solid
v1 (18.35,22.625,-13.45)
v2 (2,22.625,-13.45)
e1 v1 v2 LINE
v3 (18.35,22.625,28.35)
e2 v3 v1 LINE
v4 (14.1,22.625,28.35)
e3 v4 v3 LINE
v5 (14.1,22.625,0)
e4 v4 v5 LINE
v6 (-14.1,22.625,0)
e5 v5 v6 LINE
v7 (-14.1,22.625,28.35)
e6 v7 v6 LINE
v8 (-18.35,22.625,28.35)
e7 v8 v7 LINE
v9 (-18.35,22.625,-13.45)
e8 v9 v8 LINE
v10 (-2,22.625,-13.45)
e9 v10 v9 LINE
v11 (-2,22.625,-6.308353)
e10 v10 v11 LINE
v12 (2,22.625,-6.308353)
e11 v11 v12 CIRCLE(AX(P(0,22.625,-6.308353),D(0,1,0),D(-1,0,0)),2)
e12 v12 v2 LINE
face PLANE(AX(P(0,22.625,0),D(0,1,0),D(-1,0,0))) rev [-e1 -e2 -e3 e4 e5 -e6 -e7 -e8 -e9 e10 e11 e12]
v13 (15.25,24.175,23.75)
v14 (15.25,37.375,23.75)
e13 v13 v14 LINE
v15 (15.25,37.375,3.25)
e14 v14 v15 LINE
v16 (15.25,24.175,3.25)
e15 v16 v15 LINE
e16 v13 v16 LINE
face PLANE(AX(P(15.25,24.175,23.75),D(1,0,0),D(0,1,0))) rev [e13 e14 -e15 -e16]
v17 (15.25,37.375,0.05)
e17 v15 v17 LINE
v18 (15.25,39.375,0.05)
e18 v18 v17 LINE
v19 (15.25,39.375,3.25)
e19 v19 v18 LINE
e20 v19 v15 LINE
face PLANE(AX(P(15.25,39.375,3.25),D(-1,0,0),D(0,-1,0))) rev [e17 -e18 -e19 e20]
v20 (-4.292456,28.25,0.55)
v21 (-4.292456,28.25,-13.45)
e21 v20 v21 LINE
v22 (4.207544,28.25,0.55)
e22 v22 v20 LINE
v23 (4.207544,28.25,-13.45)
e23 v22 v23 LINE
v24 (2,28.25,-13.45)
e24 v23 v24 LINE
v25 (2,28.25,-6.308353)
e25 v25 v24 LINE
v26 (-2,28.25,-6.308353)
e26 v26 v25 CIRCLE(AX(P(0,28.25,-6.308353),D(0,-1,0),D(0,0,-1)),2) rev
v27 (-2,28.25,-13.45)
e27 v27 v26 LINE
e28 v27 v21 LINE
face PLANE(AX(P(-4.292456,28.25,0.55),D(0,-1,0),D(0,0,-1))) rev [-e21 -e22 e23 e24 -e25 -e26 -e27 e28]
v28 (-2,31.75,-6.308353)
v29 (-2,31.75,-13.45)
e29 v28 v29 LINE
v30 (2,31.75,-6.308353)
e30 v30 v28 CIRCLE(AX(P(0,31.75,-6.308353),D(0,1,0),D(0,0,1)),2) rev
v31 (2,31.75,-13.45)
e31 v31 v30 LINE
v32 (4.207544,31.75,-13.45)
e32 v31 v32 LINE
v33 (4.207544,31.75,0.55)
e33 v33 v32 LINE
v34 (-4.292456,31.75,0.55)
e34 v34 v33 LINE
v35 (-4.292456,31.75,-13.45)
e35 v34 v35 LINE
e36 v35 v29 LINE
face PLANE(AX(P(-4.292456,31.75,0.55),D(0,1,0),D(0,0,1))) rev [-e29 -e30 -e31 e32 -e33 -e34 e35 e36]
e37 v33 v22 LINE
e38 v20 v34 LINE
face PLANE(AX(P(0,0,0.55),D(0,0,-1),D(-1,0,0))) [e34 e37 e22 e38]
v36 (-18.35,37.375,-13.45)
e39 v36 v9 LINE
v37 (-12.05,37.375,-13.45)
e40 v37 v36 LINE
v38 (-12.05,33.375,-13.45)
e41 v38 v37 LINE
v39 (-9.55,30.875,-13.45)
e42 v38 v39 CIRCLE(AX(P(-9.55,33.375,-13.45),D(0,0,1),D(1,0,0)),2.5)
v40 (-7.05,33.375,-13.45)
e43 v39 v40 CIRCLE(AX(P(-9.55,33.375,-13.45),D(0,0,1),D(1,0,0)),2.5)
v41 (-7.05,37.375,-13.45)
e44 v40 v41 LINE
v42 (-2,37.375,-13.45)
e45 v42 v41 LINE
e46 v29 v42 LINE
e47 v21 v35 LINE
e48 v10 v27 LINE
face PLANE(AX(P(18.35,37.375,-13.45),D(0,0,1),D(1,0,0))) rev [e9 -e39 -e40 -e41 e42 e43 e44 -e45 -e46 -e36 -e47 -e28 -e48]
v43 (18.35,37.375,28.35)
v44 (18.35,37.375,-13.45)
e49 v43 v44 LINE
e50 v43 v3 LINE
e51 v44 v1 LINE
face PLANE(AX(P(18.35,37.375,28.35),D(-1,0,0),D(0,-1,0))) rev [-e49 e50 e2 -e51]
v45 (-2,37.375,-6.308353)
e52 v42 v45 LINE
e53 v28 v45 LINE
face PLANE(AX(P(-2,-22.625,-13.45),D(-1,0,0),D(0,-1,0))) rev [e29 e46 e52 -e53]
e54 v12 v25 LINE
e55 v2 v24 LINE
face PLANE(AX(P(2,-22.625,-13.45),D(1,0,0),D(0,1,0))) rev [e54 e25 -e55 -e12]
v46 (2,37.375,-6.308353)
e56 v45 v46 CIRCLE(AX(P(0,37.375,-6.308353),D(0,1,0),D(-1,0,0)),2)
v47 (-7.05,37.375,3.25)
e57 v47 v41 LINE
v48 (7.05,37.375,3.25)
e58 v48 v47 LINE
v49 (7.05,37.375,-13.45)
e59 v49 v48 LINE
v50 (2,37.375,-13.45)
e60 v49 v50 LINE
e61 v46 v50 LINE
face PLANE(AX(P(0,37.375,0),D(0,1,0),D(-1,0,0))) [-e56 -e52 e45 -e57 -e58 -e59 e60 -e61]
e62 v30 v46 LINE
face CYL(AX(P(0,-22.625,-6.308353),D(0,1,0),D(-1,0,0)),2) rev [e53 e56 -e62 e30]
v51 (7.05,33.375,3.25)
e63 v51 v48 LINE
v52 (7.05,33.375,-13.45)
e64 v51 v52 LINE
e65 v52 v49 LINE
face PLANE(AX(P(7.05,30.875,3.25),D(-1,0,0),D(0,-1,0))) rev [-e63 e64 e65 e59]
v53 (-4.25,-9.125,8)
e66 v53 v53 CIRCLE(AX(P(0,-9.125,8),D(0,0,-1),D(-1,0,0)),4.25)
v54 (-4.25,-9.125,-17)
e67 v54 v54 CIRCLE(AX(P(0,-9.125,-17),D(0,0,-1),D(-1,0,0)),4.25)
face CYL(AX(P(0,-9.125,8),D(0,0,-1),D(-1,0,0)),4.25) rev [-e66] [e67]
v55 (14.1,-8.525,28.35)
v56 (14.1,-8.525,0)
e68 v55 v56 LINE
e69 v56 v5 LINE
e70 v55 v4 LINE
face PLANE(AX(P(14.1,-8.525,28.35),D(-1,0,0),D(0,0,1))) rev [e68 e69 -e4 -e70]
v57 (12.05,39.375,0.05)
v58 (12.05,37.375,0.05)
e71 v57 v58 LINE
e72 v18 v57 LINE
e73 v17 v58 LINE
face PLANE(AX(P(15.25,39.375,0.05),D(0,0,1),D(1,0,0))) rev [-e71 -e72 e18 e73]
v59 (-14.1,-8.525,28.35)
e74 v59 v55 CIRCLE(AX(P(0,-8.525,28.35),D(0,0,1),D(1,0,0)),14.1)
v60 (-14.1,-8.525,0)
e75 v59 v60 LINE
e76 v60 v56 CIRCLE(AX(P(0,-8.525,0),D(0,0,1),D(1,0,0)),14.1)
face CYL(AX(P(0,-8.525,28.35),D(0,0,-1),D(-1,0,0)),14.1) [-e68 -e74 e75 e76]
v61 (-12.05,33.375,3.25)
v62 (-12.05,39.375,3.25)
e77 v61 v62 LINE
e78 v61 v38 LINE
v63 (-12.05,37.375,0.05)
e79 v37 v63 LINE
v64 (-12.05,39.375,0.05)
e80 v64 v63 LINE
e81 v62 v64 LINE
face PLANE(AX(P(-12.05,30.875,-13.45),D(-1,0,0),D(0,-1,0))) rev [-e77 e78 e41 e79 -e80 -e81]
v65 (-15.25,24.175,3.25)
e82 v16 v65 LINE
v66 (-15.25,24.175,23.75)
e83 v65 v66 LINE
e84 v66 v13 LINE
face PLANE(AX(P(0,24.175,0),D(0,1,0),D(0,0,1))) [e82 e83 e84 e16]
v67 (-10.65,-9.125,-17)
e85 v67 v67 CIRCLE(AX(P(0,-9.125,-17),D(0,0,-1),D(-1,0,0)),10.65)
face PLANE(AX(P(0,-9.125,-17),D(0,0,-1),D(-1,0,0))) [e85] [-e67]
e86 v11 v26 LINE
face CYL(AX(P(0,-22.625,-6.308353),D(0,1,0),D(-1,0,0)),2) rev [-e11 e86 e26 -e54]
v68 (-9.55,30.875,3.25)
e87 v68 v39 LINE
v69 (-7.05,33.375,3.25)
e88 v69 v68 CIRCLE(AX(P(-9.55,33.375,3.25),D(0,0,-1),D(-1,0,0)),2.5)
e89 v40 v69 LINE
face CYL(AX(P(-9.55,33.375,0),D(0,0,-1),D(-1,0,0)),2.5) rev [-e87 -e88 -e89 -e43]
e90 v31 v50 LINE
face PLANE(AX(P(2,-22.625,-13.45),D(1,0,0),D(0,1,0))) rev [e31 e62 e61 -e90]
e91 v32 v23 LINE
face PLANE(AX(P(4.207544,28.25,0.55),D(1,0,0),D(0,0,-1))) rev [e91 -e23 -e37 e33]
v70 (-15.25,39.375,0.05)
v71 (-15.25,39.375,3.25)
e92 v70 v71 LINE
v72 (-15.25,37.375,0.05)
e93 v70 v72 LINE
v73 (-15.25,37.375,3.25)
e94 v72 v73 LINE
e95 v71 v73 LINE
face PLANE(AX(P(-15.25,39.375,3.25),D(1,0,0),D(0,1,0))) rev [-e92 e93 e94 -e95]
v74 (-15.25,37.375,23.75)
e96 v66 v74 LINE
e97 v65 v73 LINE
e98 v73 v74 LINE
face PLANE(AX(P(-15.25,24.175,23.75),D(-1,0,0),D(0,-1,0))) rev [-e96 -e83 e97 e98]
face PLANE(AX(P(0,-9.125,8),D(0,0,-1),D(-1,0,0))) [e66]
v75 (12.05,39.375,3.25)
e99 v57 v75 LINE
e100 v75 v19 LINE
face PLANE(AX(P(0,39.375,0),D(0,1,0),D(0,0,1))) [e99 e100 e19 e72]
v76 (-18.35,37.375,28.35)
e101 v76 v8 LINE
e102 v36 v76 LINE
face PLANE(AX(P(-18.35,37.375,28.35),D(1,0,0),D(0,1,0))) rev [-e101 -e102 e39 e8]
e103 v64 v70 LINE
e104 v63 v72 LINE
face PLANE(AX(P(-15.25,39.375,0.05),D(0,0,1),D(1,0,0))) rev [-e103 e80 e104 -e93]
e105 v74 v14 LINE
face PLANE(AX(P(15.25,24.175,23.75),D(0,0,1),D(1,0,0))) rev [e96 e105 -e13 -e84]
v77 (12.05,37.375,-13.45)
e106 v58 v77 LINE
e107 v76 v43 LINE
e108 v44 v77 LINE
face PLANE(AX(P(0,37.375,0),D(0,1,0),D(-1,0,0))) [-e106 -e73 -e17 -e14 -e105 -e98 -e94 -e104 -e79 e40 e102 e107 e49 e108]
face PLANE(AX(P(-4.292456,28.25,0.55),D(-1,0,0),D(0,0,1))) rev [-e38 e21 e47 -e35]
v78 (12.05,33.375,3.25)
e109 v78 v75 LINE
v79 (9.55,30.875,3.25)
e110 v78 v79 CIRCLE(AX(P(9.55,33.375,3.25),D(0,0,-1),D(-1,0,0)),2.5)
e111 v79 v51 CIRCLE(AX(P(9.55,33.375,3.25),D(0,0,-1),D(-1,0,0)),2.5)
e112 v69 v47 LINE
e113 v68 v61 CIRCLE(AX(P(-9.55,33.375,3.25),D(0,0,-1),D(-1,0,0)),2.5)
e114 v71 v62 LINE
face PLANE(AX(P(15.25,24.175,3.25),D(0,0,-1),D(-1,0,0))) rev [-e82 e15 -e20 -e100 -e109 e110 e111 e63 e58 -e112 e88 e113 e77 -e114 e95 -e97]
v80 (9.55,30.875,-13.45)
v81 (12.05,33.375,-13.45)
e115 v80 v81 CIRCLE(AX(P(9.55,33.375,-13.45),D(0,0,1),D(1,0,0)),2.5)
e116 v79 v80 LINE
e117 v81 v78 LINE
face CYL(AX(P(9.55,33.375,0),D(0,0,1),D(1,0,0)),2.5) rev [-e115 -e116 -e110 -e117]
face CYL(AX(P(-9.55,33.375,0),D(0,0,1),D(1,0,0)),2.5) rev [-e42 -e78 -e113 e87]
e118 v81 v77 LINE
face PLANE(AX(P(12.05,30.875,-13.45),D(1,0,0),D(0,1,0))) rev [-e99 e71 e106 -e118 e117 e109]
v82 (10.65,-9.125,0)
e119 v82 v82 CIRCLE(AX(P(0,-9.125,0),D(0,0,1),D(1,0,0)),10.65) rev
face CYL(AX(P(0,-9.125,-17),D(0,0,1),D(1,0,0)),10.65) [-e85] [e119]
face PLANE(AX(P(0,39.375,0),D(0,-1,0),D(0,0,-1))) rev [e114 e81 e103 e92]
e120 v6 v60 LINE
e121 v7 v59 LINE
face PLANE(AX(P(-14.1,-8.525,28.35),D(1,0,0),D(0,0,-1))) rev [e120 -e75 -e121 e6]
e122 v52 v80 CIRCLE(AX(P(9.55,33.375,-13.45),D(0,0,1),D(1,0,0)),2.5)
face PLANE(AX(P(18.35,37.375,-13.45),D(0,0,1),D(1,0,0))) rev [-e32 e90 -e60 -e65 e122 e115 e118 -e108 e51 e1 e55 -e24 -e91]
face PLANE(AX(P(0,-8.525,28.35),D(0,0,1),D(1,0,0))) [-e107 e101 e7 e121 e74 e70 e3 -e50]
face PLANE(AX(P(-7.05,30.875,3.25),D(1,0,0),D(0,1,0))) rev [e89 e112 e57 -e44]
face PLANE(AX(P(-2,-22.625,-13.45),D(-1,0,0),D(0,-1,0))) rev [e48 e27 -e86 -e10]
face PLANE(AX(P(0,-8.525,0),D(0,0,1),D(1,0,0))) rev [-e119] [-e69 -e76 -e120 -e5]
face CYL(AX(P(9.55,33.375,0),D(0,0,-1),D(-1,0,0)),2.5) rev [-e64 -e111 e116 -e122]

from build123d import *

# Parameters (mm, degrees)
RESSALTO_EXTRUS_O1_DEPTH = 28.35
ESBO_O3_W                = 36.7
ESBO_O3_H                = 41.8
RESSALTO_EXTRUS_O2_DEPTH = 14.75
ESBO_O5_W                = 30.5
ESBO_O5_H                = 20.5
CORTE_EXTRUS_O2_DEPTH    = 13.2
CORTE_EXTRUS_O3_DEPTH    = 69.850889609
ESBO_O7_W                = 5
ESBO_O7_H                = 16.7
CORTE_EXTRUS_O4_DEPTH    = 6.5
FILETE1_R                = 2.5
ESBO_O8_W                = 8.5
ESBO_O8_H                = 3.5
CORTE_EXTRUS_O5_DEPTH    = 14
ESBO_O9_W                = 3.2
ESBO_O9_H                = 3.2
RESSALTO_EXTRUS_O3_DEPTH = 2
ESBO_O10_R               = 10.65
RESSALTO_EXTRUS_O4_DEPTH = 17
ESBO_O11_R               = 4.25
CORTE_EXTRUS_O6_DEPTH    = 25


with BuildPart() as part:
    # Esboço1 → Ressalto-extrusão1 (new body)
    with BuildSketch(Plane.XY):
        with BuildLine():
            Line((14.1, -8.525), (14.1, 22.625))
            Line((14.1, 22.625), (-14.1, 22.625))
            Line((-14.1, 22.625), (-14.1, -8.525))
            ThreePointArc((-14.1, -8.525), (0, -22.625), (14.1, -8.525))
        make_face()
    extrude(amount=RESSALTO_EXTRUS_O1_DEPTH)

    # Esboço3 → Ressalto-extrusão2 (add)
    with BuildSketch(Plane(origin=(0, 22.625, 0), x_dir=(1, 0, 0), z_dir=(0, 1, 0))):
        with Locations((0, -7.45)):
            Rectangle(ESBO_O3_W, ESBO_O3_H)
    extrude(amount=RESSALTO_EXTRUS_O2_DEPTH)

    # Esboço5 → Corte-extrusão2 (cut)
    with BuildSketch(Plane(origin=(0, 37.375, 0), x_dir=(1, 0, 0), z_dir=(0, 1, 0))):
        with Locations((0, -13.5)):
            Rectangle(ESBO_O5_W, ESBO_O5_H)
    extrude(amount=-CORTE_EXTRUS_O2_DEPTH, mode=Mode.SUBTRACT)

    # Esboço6 → Corte-extrusão3 (cut, through all)
    with BuildSketch(Plane(origin=(0, 37.375, 0), x_dir=(1, 0, 0), z_dir=(0, 1, 0))):
        with BuildLine():
            Line((-2, 13.45), (-2, 6.30835312))
            ThreePointArc((-2, 6.30835312), (0, 4.30835312), (2, 6.30835312))
            Line((2, 6.30835312), (2, 13.45))
            Line((2, 13.45), (-2, 13.45))
        make_face()
    extrude(amount=-CORTE_EXTRUS_O3_DEPTH, mode=Mode.SUBTRACT)

    # Esboço7 → Corte-extrusão4 (cut)
    with BuildSketch(Plane(origin=(0, 37.375, 0), x_dir=(1, 0, 0), z_dir=(0, 1, 0))):
        with Locations((-9.55, 5.1)):
            Rectangle(ESBO_O7_W, ESBO_O7_H)
        with Locations((9.55, 5.1)):
            Rectangle(ESBO_O7_W, ESBO_O7_H)
    extrude(amount=-CORTE_EXTRUS_O4_DEPTH, mode=Mode.SUBTRACT)

    # Filete1
    filete1_edges = [part.edges().sort_by_distance(p)[0] for p in [
        (-12.05, 30.875, -5.1),
        (-7.05, 30.875, -5.1),
        (7.05, 30.875, -5.1),
        (12.05, 30.875, -5.1),
    ]]
    fillet(filete1_edges, radius=FILETE1_R - 0.0001)  # a hair under: the kernel refuses the full size

    # Esboço8 → Corte-extrusão5 (cut)
    with BuildSketch(Plane(origin=(0, 0, -13.45), x_dir=(-1, 0, 0), z_dir=(0, 0, -1))):
        with Locations((0.04245602, 30)):
            Rectangle(ESBO_O8_W, ESBO_O8_H)
    extrude(amount=-CORTE_EXTRUS_O5_DEPTH, mode=Mode.SUBTRACT)

    # Esboço9 → Ressalto-extrusão3 (add)
    with BuildSketch(Plane(origin=(0, 37.375, 0), x_dir=(1, 0, 0), z_dir=(0, 1, 0))):
        with Locations((-13.65, -1.65)):
            Rectangle(ESBO_O9_W, ESBO_O9_H)
        with Locations((13.65, -1.65)):
            Rectangle(ESBO_O9_W, ESBO_O9_H)
    extrude(amount=RESSALTO_EXTRUS_O3_DEPTH)

    # Esboço10 → Ressalto-extrusão4 (add)
    with BuildSketch(Plane(origin=(0, 0, 0), x_dir=(-1, 0, 0), z_dir=(0, 0, -1))):
        with Locations(Location((0, -9.125, 0), (0, 0, 180))):
            Circle(ESBO_O10_R)
    extrude(amount=RESSALTO_EXTRUS_O4_DEPTH)

    # Esboço11 → Corte-extrusão6 (cut)
    with BuildSketch(Plane(origin=(0, 0, -17), x_dir=(-1, 0, 0), z_dir=(0, 0, -1))):
        with Locations((0, -9.125)):
            Circle(ESBO_O11_R)
    extrude(amount=-CORTE_EXTRUS_O6_DEPTH, mode=Mode.SUBTRACT)


solid = part.part
